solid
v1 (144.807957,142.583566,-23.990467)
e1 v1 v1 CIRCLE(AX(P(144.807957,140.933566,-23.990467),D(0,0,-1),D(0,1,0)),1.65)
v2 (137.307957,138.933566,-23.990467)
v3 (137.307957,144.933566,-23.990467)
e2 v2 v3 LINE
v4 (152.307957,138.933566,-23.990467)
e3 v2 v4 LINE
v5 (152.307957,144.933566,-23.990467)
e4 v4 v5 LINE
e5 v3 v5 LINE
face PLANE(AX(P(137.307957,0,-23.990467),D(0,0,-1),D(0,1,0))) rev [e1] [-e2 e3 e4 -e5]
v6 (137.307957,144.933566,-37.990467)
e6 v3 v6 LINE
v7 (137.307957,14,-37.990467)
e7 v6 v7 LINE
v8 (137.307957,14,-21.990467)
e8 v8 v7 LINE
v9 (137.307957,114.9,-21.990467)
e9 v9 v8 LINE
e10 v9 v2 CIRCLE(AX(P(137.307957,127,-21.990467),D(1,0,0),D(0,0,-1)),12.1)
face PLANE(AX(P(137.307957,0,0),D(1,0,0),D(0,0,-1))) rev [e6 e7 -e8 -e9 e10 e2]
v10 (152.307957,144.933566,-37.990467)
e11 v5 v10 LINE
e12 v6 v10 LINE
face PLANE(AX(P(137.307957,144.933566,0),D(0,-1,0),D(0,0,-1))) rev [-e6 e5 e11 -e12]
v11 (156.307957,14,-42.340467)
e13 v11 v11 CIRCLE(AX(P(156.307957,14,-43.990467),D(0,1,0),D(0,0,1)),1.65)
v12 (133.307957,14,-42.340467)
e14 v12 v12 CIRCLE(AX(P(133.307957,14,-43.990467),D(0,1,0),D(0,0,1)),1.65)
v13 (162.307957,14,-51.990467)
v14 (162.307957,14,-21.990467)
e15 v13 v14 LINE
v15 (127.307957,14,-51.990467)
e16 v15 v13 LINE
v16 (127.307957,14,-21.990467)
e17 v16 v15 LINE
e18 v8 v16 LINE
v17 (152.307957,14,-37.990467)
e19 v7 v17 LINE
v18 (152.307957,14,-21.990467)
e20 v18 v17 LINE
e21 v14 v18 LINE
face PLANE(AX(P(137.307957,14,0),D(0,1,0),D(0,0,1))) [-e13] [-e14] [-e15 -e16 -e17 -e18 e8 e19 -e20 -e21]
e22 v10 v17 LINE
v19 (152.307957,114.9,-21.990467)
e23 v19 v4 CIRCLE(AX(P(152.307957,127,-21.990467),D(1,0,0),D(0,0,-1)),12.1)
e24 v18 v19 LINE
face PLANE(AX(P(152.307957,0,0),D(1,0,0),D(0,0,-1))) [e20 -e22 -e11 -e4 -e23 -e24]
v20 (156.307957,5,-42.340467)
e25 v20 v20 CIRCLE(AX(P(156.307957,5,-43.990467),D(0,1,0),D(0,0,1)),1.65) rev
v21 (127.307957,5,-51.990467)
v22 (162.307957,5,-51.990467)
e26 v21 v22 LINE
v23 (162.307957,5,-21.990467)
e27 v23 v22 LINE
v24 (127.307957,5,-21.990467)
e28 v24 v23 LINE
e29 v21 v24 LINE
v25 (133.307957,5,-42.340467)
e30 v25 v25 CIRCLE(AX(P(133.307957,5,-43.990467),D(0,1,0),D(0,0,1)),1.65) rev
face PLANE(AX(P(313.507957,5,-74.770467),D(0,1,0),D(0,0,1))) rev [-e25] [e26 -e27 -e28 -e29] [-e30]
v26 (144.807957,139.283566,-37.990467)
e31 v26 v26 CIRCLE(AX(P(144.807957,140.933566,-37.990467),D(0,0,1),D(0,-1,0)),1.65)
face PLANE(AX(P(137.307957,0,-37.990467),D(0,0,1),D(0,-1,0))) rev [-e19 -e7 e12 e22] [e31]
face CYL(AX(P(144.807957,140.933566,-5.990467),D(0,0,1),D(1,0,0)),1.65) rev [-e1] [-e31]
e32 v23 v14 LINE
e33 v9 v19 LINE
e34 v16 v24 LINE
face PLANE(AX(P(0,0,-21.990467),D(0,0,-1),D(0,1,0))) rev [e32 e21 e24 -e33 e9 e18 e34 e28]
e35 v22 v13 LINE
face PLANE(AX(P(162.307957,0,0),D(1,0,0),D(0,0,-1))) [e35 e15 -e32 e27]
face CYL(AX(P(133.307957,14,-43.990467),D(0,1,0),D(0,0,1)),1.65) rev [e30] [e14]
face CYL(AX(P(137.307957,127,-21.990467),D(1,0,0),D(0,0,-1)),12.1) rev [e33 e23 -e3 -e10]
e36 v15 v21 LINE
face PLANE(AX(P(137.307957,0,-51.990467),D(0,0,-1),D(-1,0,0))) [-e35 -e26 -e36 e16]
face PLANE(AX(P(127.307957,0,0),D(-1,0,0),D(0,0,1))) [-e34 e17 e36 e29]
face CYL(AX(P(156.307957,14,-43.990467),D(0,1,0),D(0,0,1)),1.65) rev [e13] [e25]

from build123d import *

# Parameters (mm, degrees)
SKETCH_2_W                 = 240.549430728
SKETCH_2_H                 = 149.540933388
EXTRUDE_1_DEPTH            = 5
SKETCH_6_W                 = 93.246571425
SKETCH_6_H                 = 149.540933388
EXTRUDE_4_DEPTH            = 5
SKETCH_8_W                 = 274.716709757
SKETCH_8_H                 = 58.51354913
EXTRUDE_6_DEPTH            = 5
CUT_EXTRUDE_2_DEPTH        = 252.755772101
CUT_EXTRUDE_2_DEPTH_BACK   = 252.755772101
SKETCH_9_W                 = 59.079292396
SKETCH_9_H                 = 149.540933388
SKETCH_10_W                = 104.703380117
SKETCH_10_H                = 208.054482518
CUT_EXTRUDE_3_DEPTH        = 10
SKETCH_12_W                = 200
SKETCH_12_H                = 200
EXTRUDE_7_DEPTH            = 5
SKETCH_13_OUTSIDE_W        = 259.728
SKETCH_13_OUTSIDE_H        = 267.782
SKETCH_13_OUTSIDE_W_2      = 200
SKETCH_13_OUTSIDE_H_2      = 200
CUT_EXTRUDE_4_DEPTH        = 278.64321362
EXTRUDE_START              = -75
SKETCH_18_R                = 5.25
EXTRUDE_9_DEPTH            = 10
EXTRUDE_START_2            = -46
EXTRUDE_10_DEPTH           = 15
EXTRUDE_START_3            = -91.2
EXTRUDE_11_DEPTH           = 15
EXTRUDE_12_REACH           = 307.894
SKETCH_20_R                = 5.25
SKETCH_26_W                = 200
SKETCH_26_H                = 5
EXTRUDE_13_DEPTH           = 100
SKETCH_27_W                = 200
SKETCH_27_H                = 5
CUT_EXTRUDE_5_DEPTH        = 30
EXTRUDE_14_DEPTH           = 10
SKETCH_29_W                = 60
SKETCH_29_H                = 9
EXTRUDE_15_DEPTH           = 10
HOLE_WIZARD_M4_1_D         = 3.3
HOLE_WIZARD_M4_2_D         = 3.3
HOLE_WIZARD_M4_3_D         = 3.3
EXTRUDE_16_DEPTH           = 10
SKETCH_37_W                = 60
SKETCH_37_H                = 9
EXTRUDE_17_DEPTH           = 10
HOLE_WIZARD_M4_4_D         = 3.3
EXTRUDE_START_4            = -3.5
SKETCH_40_R                = 5.25
SKETCH_40_R_2              = 3.25
EXTRUDE_18_DEPTH           = 46.5
CUT_EXTRUDE_START          = -3.5
SKETCH_41_R                = 5.25
SKETCH_41_R_2              = 3.25
CUT_EXTRUDE_6_DEPTH        = 3.5
HOLE_WIZARD_M4_5_OUTLINE_R = 1.65
HOLE_WIZARD_M4_5_DEPTH     = 14
CUT_EXTRUDE_7_DEPTH        = 400.170489639
CUT_EXTRUDE_7_DEPTH_BACK   = 400.170489639
SKETCH_44_W                = 15
SKETCH_44_H                = 131.085631965
SKETCH_44_W_2              = 270
SKETCH_44_H_2              = 5
CUT_EXTRUDE_START_2        = -16
CUT_EXTRUDE_8_DEPTH        = 30


# Read off the part's stored shape, not the designer's step: M4 螺纹孔5
with BuildPart() as part:
    # 草图2 → 凸台-拉伸1 (new body)
    with BuildSketch(Plane(origin=(0, 0, 0), x_dir=(1, 0, 0), z_dir=(0, 1, 0))):
        Rectangle(SKETCH_2_W, SKETCH_2_H)
    extrude(amount=EXTRUDE_1_DEPTH)

    # 草图6 → 凸台-拉伸4 (add)
    with BuildSketch(Plane(origin=(0, 5, 0), x_dir=(1, 0, 0), z_dir=(0, 1, 0))):
        with Locations((166.898001077, 0)):
            Rectangle(SKETCH_6_W, SKETCH_6_H)
    extrude(amount=-EXTRUDE_4_DEPTH)

    # 草图8 → 凸台-拉伸6 (add)
    with BuildSketch(Plane(origin=(0, 5, 0), x_dir=(1, 0, 0), z_dir=(0, 1, 0))):
        with Locations((76.162931911, -104.027241259)):
            Rectangle(SKETCH_8_W, SKETCH_8_H)
    extrude(amount=-EXTRUDE_6_DEPTH)

    # 草图9 → 切除-拉伸2 (cut, two sides: drawn at the far end of the back side and taken through both)
    with BuildSketch(Plane(origin=(0, 5, 0), x_dir=(1, 0, 0), z_dir=(0, 1, 0)).offset(-CUT_EXTRUDE_2_DEPTH_BACK)):
        with Locations((-90.735069166, 0)):
            Rectangle(SKETCH_9_W, SKETCH_9_H)
    extrude(amount=CUT_EXTRUDE_2_DEPTH + CUT_EXTRUDE_2_DEPTH_BACK, mode=Mode.SUBTRACT)

    # 草图10 → 切除-拉伸3 (cut)
    with BuildSketch(Plane(origin=(0, 5, 0), x_dir=(1, 0, 0), z_dir=(0, 1, 0))):
        with Locations((-8.84373291, -29.256774565)):
            Rectangle(SKETCH_10_W, SKETCH_10_H)
    extrude(amount=-CUT_EXTRUDE_3_DEPTH, mode=Mode.SUBTRACT)

    # 草图12 → 凸台-拉伸7 (add)
    with BuildSketch(Plane(origin=(0, 5, 0), x_dir=(1, 0, 0), z_dir=(0, 1, 0))):
        with Locations((143.507957149, -25.229533306)):
            Rectangle(SKETCH_12_W, SKETCH_12_H)
    extrude(amount=-EXTRUDE_7_DEPTH)

    # 草图13 outside → 切除-拉伸4 (cut, through all)
    with BuildSketch(Plane(origin=(0, 5, 0), x_dir=(1, 0, 0), z_dir=(0, 1, 0))):
        with Locations((143.508, -29.257)):
            Rectangle(SKETCH_13_OUTSIDE_W, SKETCH_13_OUTSIDE_H)
        with Locations((143.507957149, -25.229533306)):
            Rectangle(SKETCH_13_OUTSIDE_W_2, SKETCH_13_OUTSIDE_H_2, mode=Mode.SUBTRACT)
    extrude(amount=-CUT_EXTRUDE_4_DEPTH, mode=Mode.SUBTRACT)

    # 草图18 → 凸台-拉伸9 (add)
    with BuildSketch(Plane.XY.offset(125.229533306).offset(EXTRUDE_START)):
        with BuildLine():
            Line((95.507957149, 14), (95.507957149, 125))
            ThreePointArc((95.507957149, 125), (88.507957149, 132), (81.507957149, 125))
            Line((81.507957149, 125), (81.507957149, 14))
            Line((81.507957149, 14), (68.507957149, 14))
            Line((68.507957149, 14), (68.507957149, 5))
            Line((68.507957149, 5), (108.507957149, 5))
            Line((108.507957149, 5), (108.507957149, 14))
            Line((108.507957149, 14), (95.507957149, 14))
        make_face()
        with Locations((88.507957149, 125)):
            Circle(SKETCH_18_R, mode=Mode.SUBTRACT)
    extrude_9 = extrude(amount=-EXTRUDE_9_DEPTH)

    # 镜向1: 凸台-拉伸9 across plane
    add(extrude_9.mirror(Plane.XY.offset(25.229533306)))

    # 草图16 → 凸台-拉伸10 (add)
    with BuildSketch(Plane(origin=(243.507957149, 0, 0), x_dir=(0, 0, -1), z_dir=(1, 0, 0)).offset(EXTRUDE_START_2)):
        with BuildLine():
            Line((-53.779533306, 14), (-53.779533306, 145.085631965))
            Line((-53.779533306, 145.085631965), (-67.779533306, 145.085631965))
            Line((-67.779533306, 145.085631965), (-67.779533306, 139.085631965))
            ThreePointArc((-67.779533306, 139.085631965), (-69.779533306, 114.75), (-71.779533306, 139.085631965))
            Line((-71.779533306, 139.085631965), (-71.779533306, 145.085631965))
            Line((-71.779533306, 145.085631965), (-85.779533306, 145.085631965))
            Line((-85.779533306, 145.085631965), (-85.779533306, 14))
            Line((-85.779533306, 14), (-99.779533306, 14))
            Line((-99.779533306, 14), (-99.779533306, 5))
            Line((-99.779533306, 5), (-39.779533306, 5))
            Line((-39.779533306, 5), (-39.779533306, 14))
            Line((-39.779533306, 14), (-53.779533306, 14))
        make_face()
    extrude(amount=-EXTRUDE_10_DEPTH)

    # 草图19 → 凸台-拉伸11 (add)
    with BuildSketch(Plane(origin=(243.507957149, 0, 0), x_dir=(0, 0, -1), z_dir=(1, 0, 0)).offset(EXTRUDE_START_3)):
        with BuildLine():
            Line((37.990466694, 14), (37.990466694, 144.933566106))
            Line((37.990466694, 144.933566106), (23.990466694, 144.933566106))
            Line((23.990466694, 144.933566106), (23.990466694, 138.933566106))
            ThreePointArc((23.990466694, 138.933566106), (21.990466694, 114.9), (19.990466694, 138.933566106))
            Line((19.990466694, 138.933566106), (19.990466694, 144.933566106))
            Line((19.990466694, 144.933566106), (5.990466694, 144.933566106))
            Line((5.990466694, 144.933566106), (5.990466694, 14))
            Line((5.990466694, 14), (-8.009533306, 14))
            Line((-8.009533306, 14), (-8.009533306, 5))
            Line((-8.009533306, 5), (51.990466694, 5))
            Line((51.990466694, 5), (51.990466694, 14))
            Line((51.990466694, 14), (37.990466694, 14))
        make_face()
    extrude(amount=-EXTRUDE_11_DEPTH)

    # 草图20 → 凸台-拉伸12 (add, up to next)
    with BuildSketch(Plane(origin=(0, 0, 40.229533306), x_dir=(-1, 0, 0), z_dir=(0, 0, -1)), mode=Mode.PRIVATE) as extrude_12_sk1:
        with BuildLine():
            Line((-108.507957149, 5), (-68.507957149, 5))
            Line((-68.507957149, 5), (-68.507957149, 14))
            Line((-68.507957149, 14), (-81.507957149, 14))
            Line((-81.507957149, 14), (-81.507957149, 125))
            ThreePointArc((-81.507957149, 125), (-88.507957149, 132), (-95.507957149, 125))
            Line((-95.507957149, 125), (-95.507957149, 14))
            Line((-95.507957149, 14), (-108.507957149, 14))
            Line((-108.507957149, 14), (-108.507957149, 5))
        make_face()
        with Locations(Location((-88.507957149, 125, 0), (0, 0, 180))):
            Circle(SKETCH_20_R, mode=Mode.SUBTRACT)
    extrude_12_tool1 = extrude(extrude_12_sk1.sketch, amount=EXTRUDE_12_REACH, mode=Mode.PRIVATE) - part.part
    add(extrude_12_tool1.solids().sort_by_distance((88.507957, 57.997401, 40.229533))[0])

    # 草图26 → 凸台-拉伸13 (add)
    with BuildSketch(Plane(origin=(243.507957149, 0, 0), x_dir=(0, 0, -1), z_dir=(1, 0, 0))):
        with Locations((-25.229533306, 2.5)):
            Rectangle(SKETCH_26_W, SKETCH_26_H)
    extrude(amount=EXTRUDE_13_DEPTH)

    # 草图27 → 切除-拉伸5 (cut)
    with BuildSketch(Plane(origin=(343.507957149, 0, 0), x_dir=(0, 0, -1), z_dir=(1, 0, 0))):
        with Locations((-25.229533306, 2.5)):
            Rectangle(SKETCH_27_W, SKETCH_27_H)
    extrude(amount=-CUT_EXTRUDE_5_DEPTH, mode=Mode.SUBTRACT)

    # 草图28 → 凸台-拉伸14 (add)
    with BuildSketch(Plane(origin=(197.507957149, 0, 0), x_dir=(0, 0, -1), z_dir=(1, 0, 0))):
        Polygon((-85.779533306, 14), (-53.779533306, 14), (-39.779533306, 14), (-39.779533306, 5), (-99.779533306, 5), (-99.779533306, 14), align=None)
    extrude(amount=EXTRUDE_14_DEPTH)

    # 草图29 → 凸台-拉伸15 (add)
    with BuildSketch(Plane.ZY.offset(-182.507957149)):
        with Locations((69.779533306, 9.5)):
            Rectangle(SKETCH_29_W, SKETCH_29_H)
    extrude(amount=EXTRUDE_15_DEPTH)

    # M4 螺纹孔1 (through all)
    with Locations(Plane(origin=(0, 14, 0), x_dir=(1, 0, 0), z_dir=(0, 1, 0))):
        with Locations((178.507957149, -47.779533306), (201.507957149, -47.779533306), (201.507957149, -91.779533306), (178.507957149, -91.779533306)):
            Hole(HOLE_WIZARD_M4_1_D / 2)

    # M4 螺纹孔2 (through all)
    with Locations(Plane.XY.offset(85.779533306)):
        with Locations((190.007957149, 141.085631965)):
            Hole(HOLE_WIZARD_M4_2_D / 2)

    # M4 螺纹孔3 (through all)
    with Locations(Plane.XY.offset(-5.990466694)):
        with Locations((144.807957149, 140.933566106)):
            Hole(HOLE_WIZARD_M4_3_D / 2)

    # 草图36 → 凸台-拉伸16 (add)
    with BuildSketch(Plane(origin=(152.307957149, 0, 0), x_dir=(0, 0, -1), z_dir=(1, 0, 0))):
        Polygon((5.990466694, 14), (37.990466694, 14), (51.990466694, 14), (51.990466694, 5), (-8.009533306, 5), (-8.009533306, 14), align=None)
    extrude(amount=EXTRUDE_16_DEPTH)

    # 草图37 → 凸台-拉伸17 (add)
    with BuildSketch(Plane.ZY.offset(-137.307957149)):
        with Locations((-21.990466694, 9.5)):
            Rectangle(SKETCH_37_W, SKETCH_37_H)
    extrude(amount=EXTRUDE_17_DEPTH)

    # M4 螺纹孔4 (through all)
    with Locations(Plane(origin=(0, 14, 0), x_dir=(1, 0, 0), z_dir=(0, 1, 0))):
        with Locations((133.307957149, 43.990466694), (156.307957149, 43.990466694), (156.307957149, -0.009533306), (133.307957149, -0.009533306)):
            Hole(HOLE_WIZARD_M4_4_D / 2)

    # 草图40 → 凸台-拉伸18 (add)
    with BuildSketch(Plane.XY.offset(50.229533306).offset(EXTRUDE_START_4)):
        with Locations((88.507957149, 125)):
            Circle(SKETCH_40_R)
        with Locations((88.507957149, 125)):
            Circle(SKETCH_40_R_2, mode=Mode.SUBTRACT)
    extrude(amount=-EXTRUDE_18_DEPTH)

    # 草图41 → 切除-拉伸6 (cut)
    with BuildSketch(Plane(origin=(0, 0, 0.229533306), x_dir=(-1, 0, 0), z_dir=(0, 0, -1)).offset(CUT_EXTRUDE_START)):
        with Locations(Location((-88.507957149, 125, 0), (0, 0, 180))):
            Circle(SKETCH_41_R)
        with Locations(Location((-88.507957149, 125, 0), (0, 0, 180))):
            Circle(SKETCH_41_R_2, mode=Mode.SUBTRACT)
    extrude(amount=CUT_EXTRUDE_6_DEPTH, mode=Mode.SUBTRACT)

    # M4 螺纹孔5 outline → M4 螺纹孔5 (cut)
    with BuildSketch(Plane(origin=(0, 0, 0), x_dir=(1, 0, 0), z_dir=(0, 1, 0))):
        with Locations((73.507957149, -42.229533306)):
            Circle(HOLE_WIZARD_M4_5_OUTLINE_R)
        with Locations((103.507957149, -42.229533306)):
            Circle(HOLE_WIZARD_M4_5_OUTLINE_R)
        with Locations((103.507957149, -8.229533306)):
            Circle(HOLE_WIZARD_M4_5_OUTLINE_R)
        with Locations((73.507957149, -8.229533306)):
            Circle(HOLE_WIZARD_M4_5_OUTLINE_R)
    extrude(amount=HOLE_WIZARD_M4_5_DEPTH, mode=Mode.SUBTRACT)

    # 草图44 → 切除-拉伸7 (cut, two sides: drawn at the far end of the back side and taken through both)
    with BuildSketch(Plane.XY.offset(125.229533306).offset(-CUT_EXTRUDE_7_DEPTH_BACK)):
        with Locations((190.007957149, 79.542815983)):
            Rectangle(SKETCH_44_W, SKETCH_44_H)
        Polygon((172.507957149, 14), (172.507957149, 5), (207.507957149, 5), (207.507957149, 14), (197.507957149, 14), (182.507957149, 14), align=None)
        with BuildLine():
            Line((68.507957149, 5), (108.507957149, 5))
            Line((108.507957149, 5), (108.507957149, 14))
            Line((108.507957149, 14), (95.507957149, 14))
            Line((95.507957149, 14), (95.507957149, 125))
            ThreePointArc((95.507957149, 125), (88.507957149, 132), (81.507957149, 125))
            Line((81.507957149, 125), (81.507957149, 14))
            Line((81.507957149, 14), (68.507957149, 14))
            Line((68.507957149, 14), (68.507957149, 5))
        make_face()
        with Locations((178.507957149, 2.5)):
            Rectangle(SKETCH_44_W_2, SKETCH_44_H_2)
    extrude(amount=CUT_EXTRUDE_7_DEPTH + CUT_EXTRUDE_7_DEPTH_BACK, mode=Mode.SUBTRACT)

    # 草图45 → 切除-拉伸8 (cut)
    with BuildSketch(Plane.XY.offset(-5.990466694).offset(CUT_EXTRUDE_START_2)):
        Polygon((137.307957149, 14), (127.307957149, 14), (127.307957149, 5), (162.307957149, 5), (162.307957149, 14), (152.307957149, 14), (152.307957149, 144.933566106), (137.307957149, 144.933566106), align=None)
    extrude(amount=CUT_EXTRUDE_8_DEPTH, mode=Mode.SUBTRACT)


solid = part.part
